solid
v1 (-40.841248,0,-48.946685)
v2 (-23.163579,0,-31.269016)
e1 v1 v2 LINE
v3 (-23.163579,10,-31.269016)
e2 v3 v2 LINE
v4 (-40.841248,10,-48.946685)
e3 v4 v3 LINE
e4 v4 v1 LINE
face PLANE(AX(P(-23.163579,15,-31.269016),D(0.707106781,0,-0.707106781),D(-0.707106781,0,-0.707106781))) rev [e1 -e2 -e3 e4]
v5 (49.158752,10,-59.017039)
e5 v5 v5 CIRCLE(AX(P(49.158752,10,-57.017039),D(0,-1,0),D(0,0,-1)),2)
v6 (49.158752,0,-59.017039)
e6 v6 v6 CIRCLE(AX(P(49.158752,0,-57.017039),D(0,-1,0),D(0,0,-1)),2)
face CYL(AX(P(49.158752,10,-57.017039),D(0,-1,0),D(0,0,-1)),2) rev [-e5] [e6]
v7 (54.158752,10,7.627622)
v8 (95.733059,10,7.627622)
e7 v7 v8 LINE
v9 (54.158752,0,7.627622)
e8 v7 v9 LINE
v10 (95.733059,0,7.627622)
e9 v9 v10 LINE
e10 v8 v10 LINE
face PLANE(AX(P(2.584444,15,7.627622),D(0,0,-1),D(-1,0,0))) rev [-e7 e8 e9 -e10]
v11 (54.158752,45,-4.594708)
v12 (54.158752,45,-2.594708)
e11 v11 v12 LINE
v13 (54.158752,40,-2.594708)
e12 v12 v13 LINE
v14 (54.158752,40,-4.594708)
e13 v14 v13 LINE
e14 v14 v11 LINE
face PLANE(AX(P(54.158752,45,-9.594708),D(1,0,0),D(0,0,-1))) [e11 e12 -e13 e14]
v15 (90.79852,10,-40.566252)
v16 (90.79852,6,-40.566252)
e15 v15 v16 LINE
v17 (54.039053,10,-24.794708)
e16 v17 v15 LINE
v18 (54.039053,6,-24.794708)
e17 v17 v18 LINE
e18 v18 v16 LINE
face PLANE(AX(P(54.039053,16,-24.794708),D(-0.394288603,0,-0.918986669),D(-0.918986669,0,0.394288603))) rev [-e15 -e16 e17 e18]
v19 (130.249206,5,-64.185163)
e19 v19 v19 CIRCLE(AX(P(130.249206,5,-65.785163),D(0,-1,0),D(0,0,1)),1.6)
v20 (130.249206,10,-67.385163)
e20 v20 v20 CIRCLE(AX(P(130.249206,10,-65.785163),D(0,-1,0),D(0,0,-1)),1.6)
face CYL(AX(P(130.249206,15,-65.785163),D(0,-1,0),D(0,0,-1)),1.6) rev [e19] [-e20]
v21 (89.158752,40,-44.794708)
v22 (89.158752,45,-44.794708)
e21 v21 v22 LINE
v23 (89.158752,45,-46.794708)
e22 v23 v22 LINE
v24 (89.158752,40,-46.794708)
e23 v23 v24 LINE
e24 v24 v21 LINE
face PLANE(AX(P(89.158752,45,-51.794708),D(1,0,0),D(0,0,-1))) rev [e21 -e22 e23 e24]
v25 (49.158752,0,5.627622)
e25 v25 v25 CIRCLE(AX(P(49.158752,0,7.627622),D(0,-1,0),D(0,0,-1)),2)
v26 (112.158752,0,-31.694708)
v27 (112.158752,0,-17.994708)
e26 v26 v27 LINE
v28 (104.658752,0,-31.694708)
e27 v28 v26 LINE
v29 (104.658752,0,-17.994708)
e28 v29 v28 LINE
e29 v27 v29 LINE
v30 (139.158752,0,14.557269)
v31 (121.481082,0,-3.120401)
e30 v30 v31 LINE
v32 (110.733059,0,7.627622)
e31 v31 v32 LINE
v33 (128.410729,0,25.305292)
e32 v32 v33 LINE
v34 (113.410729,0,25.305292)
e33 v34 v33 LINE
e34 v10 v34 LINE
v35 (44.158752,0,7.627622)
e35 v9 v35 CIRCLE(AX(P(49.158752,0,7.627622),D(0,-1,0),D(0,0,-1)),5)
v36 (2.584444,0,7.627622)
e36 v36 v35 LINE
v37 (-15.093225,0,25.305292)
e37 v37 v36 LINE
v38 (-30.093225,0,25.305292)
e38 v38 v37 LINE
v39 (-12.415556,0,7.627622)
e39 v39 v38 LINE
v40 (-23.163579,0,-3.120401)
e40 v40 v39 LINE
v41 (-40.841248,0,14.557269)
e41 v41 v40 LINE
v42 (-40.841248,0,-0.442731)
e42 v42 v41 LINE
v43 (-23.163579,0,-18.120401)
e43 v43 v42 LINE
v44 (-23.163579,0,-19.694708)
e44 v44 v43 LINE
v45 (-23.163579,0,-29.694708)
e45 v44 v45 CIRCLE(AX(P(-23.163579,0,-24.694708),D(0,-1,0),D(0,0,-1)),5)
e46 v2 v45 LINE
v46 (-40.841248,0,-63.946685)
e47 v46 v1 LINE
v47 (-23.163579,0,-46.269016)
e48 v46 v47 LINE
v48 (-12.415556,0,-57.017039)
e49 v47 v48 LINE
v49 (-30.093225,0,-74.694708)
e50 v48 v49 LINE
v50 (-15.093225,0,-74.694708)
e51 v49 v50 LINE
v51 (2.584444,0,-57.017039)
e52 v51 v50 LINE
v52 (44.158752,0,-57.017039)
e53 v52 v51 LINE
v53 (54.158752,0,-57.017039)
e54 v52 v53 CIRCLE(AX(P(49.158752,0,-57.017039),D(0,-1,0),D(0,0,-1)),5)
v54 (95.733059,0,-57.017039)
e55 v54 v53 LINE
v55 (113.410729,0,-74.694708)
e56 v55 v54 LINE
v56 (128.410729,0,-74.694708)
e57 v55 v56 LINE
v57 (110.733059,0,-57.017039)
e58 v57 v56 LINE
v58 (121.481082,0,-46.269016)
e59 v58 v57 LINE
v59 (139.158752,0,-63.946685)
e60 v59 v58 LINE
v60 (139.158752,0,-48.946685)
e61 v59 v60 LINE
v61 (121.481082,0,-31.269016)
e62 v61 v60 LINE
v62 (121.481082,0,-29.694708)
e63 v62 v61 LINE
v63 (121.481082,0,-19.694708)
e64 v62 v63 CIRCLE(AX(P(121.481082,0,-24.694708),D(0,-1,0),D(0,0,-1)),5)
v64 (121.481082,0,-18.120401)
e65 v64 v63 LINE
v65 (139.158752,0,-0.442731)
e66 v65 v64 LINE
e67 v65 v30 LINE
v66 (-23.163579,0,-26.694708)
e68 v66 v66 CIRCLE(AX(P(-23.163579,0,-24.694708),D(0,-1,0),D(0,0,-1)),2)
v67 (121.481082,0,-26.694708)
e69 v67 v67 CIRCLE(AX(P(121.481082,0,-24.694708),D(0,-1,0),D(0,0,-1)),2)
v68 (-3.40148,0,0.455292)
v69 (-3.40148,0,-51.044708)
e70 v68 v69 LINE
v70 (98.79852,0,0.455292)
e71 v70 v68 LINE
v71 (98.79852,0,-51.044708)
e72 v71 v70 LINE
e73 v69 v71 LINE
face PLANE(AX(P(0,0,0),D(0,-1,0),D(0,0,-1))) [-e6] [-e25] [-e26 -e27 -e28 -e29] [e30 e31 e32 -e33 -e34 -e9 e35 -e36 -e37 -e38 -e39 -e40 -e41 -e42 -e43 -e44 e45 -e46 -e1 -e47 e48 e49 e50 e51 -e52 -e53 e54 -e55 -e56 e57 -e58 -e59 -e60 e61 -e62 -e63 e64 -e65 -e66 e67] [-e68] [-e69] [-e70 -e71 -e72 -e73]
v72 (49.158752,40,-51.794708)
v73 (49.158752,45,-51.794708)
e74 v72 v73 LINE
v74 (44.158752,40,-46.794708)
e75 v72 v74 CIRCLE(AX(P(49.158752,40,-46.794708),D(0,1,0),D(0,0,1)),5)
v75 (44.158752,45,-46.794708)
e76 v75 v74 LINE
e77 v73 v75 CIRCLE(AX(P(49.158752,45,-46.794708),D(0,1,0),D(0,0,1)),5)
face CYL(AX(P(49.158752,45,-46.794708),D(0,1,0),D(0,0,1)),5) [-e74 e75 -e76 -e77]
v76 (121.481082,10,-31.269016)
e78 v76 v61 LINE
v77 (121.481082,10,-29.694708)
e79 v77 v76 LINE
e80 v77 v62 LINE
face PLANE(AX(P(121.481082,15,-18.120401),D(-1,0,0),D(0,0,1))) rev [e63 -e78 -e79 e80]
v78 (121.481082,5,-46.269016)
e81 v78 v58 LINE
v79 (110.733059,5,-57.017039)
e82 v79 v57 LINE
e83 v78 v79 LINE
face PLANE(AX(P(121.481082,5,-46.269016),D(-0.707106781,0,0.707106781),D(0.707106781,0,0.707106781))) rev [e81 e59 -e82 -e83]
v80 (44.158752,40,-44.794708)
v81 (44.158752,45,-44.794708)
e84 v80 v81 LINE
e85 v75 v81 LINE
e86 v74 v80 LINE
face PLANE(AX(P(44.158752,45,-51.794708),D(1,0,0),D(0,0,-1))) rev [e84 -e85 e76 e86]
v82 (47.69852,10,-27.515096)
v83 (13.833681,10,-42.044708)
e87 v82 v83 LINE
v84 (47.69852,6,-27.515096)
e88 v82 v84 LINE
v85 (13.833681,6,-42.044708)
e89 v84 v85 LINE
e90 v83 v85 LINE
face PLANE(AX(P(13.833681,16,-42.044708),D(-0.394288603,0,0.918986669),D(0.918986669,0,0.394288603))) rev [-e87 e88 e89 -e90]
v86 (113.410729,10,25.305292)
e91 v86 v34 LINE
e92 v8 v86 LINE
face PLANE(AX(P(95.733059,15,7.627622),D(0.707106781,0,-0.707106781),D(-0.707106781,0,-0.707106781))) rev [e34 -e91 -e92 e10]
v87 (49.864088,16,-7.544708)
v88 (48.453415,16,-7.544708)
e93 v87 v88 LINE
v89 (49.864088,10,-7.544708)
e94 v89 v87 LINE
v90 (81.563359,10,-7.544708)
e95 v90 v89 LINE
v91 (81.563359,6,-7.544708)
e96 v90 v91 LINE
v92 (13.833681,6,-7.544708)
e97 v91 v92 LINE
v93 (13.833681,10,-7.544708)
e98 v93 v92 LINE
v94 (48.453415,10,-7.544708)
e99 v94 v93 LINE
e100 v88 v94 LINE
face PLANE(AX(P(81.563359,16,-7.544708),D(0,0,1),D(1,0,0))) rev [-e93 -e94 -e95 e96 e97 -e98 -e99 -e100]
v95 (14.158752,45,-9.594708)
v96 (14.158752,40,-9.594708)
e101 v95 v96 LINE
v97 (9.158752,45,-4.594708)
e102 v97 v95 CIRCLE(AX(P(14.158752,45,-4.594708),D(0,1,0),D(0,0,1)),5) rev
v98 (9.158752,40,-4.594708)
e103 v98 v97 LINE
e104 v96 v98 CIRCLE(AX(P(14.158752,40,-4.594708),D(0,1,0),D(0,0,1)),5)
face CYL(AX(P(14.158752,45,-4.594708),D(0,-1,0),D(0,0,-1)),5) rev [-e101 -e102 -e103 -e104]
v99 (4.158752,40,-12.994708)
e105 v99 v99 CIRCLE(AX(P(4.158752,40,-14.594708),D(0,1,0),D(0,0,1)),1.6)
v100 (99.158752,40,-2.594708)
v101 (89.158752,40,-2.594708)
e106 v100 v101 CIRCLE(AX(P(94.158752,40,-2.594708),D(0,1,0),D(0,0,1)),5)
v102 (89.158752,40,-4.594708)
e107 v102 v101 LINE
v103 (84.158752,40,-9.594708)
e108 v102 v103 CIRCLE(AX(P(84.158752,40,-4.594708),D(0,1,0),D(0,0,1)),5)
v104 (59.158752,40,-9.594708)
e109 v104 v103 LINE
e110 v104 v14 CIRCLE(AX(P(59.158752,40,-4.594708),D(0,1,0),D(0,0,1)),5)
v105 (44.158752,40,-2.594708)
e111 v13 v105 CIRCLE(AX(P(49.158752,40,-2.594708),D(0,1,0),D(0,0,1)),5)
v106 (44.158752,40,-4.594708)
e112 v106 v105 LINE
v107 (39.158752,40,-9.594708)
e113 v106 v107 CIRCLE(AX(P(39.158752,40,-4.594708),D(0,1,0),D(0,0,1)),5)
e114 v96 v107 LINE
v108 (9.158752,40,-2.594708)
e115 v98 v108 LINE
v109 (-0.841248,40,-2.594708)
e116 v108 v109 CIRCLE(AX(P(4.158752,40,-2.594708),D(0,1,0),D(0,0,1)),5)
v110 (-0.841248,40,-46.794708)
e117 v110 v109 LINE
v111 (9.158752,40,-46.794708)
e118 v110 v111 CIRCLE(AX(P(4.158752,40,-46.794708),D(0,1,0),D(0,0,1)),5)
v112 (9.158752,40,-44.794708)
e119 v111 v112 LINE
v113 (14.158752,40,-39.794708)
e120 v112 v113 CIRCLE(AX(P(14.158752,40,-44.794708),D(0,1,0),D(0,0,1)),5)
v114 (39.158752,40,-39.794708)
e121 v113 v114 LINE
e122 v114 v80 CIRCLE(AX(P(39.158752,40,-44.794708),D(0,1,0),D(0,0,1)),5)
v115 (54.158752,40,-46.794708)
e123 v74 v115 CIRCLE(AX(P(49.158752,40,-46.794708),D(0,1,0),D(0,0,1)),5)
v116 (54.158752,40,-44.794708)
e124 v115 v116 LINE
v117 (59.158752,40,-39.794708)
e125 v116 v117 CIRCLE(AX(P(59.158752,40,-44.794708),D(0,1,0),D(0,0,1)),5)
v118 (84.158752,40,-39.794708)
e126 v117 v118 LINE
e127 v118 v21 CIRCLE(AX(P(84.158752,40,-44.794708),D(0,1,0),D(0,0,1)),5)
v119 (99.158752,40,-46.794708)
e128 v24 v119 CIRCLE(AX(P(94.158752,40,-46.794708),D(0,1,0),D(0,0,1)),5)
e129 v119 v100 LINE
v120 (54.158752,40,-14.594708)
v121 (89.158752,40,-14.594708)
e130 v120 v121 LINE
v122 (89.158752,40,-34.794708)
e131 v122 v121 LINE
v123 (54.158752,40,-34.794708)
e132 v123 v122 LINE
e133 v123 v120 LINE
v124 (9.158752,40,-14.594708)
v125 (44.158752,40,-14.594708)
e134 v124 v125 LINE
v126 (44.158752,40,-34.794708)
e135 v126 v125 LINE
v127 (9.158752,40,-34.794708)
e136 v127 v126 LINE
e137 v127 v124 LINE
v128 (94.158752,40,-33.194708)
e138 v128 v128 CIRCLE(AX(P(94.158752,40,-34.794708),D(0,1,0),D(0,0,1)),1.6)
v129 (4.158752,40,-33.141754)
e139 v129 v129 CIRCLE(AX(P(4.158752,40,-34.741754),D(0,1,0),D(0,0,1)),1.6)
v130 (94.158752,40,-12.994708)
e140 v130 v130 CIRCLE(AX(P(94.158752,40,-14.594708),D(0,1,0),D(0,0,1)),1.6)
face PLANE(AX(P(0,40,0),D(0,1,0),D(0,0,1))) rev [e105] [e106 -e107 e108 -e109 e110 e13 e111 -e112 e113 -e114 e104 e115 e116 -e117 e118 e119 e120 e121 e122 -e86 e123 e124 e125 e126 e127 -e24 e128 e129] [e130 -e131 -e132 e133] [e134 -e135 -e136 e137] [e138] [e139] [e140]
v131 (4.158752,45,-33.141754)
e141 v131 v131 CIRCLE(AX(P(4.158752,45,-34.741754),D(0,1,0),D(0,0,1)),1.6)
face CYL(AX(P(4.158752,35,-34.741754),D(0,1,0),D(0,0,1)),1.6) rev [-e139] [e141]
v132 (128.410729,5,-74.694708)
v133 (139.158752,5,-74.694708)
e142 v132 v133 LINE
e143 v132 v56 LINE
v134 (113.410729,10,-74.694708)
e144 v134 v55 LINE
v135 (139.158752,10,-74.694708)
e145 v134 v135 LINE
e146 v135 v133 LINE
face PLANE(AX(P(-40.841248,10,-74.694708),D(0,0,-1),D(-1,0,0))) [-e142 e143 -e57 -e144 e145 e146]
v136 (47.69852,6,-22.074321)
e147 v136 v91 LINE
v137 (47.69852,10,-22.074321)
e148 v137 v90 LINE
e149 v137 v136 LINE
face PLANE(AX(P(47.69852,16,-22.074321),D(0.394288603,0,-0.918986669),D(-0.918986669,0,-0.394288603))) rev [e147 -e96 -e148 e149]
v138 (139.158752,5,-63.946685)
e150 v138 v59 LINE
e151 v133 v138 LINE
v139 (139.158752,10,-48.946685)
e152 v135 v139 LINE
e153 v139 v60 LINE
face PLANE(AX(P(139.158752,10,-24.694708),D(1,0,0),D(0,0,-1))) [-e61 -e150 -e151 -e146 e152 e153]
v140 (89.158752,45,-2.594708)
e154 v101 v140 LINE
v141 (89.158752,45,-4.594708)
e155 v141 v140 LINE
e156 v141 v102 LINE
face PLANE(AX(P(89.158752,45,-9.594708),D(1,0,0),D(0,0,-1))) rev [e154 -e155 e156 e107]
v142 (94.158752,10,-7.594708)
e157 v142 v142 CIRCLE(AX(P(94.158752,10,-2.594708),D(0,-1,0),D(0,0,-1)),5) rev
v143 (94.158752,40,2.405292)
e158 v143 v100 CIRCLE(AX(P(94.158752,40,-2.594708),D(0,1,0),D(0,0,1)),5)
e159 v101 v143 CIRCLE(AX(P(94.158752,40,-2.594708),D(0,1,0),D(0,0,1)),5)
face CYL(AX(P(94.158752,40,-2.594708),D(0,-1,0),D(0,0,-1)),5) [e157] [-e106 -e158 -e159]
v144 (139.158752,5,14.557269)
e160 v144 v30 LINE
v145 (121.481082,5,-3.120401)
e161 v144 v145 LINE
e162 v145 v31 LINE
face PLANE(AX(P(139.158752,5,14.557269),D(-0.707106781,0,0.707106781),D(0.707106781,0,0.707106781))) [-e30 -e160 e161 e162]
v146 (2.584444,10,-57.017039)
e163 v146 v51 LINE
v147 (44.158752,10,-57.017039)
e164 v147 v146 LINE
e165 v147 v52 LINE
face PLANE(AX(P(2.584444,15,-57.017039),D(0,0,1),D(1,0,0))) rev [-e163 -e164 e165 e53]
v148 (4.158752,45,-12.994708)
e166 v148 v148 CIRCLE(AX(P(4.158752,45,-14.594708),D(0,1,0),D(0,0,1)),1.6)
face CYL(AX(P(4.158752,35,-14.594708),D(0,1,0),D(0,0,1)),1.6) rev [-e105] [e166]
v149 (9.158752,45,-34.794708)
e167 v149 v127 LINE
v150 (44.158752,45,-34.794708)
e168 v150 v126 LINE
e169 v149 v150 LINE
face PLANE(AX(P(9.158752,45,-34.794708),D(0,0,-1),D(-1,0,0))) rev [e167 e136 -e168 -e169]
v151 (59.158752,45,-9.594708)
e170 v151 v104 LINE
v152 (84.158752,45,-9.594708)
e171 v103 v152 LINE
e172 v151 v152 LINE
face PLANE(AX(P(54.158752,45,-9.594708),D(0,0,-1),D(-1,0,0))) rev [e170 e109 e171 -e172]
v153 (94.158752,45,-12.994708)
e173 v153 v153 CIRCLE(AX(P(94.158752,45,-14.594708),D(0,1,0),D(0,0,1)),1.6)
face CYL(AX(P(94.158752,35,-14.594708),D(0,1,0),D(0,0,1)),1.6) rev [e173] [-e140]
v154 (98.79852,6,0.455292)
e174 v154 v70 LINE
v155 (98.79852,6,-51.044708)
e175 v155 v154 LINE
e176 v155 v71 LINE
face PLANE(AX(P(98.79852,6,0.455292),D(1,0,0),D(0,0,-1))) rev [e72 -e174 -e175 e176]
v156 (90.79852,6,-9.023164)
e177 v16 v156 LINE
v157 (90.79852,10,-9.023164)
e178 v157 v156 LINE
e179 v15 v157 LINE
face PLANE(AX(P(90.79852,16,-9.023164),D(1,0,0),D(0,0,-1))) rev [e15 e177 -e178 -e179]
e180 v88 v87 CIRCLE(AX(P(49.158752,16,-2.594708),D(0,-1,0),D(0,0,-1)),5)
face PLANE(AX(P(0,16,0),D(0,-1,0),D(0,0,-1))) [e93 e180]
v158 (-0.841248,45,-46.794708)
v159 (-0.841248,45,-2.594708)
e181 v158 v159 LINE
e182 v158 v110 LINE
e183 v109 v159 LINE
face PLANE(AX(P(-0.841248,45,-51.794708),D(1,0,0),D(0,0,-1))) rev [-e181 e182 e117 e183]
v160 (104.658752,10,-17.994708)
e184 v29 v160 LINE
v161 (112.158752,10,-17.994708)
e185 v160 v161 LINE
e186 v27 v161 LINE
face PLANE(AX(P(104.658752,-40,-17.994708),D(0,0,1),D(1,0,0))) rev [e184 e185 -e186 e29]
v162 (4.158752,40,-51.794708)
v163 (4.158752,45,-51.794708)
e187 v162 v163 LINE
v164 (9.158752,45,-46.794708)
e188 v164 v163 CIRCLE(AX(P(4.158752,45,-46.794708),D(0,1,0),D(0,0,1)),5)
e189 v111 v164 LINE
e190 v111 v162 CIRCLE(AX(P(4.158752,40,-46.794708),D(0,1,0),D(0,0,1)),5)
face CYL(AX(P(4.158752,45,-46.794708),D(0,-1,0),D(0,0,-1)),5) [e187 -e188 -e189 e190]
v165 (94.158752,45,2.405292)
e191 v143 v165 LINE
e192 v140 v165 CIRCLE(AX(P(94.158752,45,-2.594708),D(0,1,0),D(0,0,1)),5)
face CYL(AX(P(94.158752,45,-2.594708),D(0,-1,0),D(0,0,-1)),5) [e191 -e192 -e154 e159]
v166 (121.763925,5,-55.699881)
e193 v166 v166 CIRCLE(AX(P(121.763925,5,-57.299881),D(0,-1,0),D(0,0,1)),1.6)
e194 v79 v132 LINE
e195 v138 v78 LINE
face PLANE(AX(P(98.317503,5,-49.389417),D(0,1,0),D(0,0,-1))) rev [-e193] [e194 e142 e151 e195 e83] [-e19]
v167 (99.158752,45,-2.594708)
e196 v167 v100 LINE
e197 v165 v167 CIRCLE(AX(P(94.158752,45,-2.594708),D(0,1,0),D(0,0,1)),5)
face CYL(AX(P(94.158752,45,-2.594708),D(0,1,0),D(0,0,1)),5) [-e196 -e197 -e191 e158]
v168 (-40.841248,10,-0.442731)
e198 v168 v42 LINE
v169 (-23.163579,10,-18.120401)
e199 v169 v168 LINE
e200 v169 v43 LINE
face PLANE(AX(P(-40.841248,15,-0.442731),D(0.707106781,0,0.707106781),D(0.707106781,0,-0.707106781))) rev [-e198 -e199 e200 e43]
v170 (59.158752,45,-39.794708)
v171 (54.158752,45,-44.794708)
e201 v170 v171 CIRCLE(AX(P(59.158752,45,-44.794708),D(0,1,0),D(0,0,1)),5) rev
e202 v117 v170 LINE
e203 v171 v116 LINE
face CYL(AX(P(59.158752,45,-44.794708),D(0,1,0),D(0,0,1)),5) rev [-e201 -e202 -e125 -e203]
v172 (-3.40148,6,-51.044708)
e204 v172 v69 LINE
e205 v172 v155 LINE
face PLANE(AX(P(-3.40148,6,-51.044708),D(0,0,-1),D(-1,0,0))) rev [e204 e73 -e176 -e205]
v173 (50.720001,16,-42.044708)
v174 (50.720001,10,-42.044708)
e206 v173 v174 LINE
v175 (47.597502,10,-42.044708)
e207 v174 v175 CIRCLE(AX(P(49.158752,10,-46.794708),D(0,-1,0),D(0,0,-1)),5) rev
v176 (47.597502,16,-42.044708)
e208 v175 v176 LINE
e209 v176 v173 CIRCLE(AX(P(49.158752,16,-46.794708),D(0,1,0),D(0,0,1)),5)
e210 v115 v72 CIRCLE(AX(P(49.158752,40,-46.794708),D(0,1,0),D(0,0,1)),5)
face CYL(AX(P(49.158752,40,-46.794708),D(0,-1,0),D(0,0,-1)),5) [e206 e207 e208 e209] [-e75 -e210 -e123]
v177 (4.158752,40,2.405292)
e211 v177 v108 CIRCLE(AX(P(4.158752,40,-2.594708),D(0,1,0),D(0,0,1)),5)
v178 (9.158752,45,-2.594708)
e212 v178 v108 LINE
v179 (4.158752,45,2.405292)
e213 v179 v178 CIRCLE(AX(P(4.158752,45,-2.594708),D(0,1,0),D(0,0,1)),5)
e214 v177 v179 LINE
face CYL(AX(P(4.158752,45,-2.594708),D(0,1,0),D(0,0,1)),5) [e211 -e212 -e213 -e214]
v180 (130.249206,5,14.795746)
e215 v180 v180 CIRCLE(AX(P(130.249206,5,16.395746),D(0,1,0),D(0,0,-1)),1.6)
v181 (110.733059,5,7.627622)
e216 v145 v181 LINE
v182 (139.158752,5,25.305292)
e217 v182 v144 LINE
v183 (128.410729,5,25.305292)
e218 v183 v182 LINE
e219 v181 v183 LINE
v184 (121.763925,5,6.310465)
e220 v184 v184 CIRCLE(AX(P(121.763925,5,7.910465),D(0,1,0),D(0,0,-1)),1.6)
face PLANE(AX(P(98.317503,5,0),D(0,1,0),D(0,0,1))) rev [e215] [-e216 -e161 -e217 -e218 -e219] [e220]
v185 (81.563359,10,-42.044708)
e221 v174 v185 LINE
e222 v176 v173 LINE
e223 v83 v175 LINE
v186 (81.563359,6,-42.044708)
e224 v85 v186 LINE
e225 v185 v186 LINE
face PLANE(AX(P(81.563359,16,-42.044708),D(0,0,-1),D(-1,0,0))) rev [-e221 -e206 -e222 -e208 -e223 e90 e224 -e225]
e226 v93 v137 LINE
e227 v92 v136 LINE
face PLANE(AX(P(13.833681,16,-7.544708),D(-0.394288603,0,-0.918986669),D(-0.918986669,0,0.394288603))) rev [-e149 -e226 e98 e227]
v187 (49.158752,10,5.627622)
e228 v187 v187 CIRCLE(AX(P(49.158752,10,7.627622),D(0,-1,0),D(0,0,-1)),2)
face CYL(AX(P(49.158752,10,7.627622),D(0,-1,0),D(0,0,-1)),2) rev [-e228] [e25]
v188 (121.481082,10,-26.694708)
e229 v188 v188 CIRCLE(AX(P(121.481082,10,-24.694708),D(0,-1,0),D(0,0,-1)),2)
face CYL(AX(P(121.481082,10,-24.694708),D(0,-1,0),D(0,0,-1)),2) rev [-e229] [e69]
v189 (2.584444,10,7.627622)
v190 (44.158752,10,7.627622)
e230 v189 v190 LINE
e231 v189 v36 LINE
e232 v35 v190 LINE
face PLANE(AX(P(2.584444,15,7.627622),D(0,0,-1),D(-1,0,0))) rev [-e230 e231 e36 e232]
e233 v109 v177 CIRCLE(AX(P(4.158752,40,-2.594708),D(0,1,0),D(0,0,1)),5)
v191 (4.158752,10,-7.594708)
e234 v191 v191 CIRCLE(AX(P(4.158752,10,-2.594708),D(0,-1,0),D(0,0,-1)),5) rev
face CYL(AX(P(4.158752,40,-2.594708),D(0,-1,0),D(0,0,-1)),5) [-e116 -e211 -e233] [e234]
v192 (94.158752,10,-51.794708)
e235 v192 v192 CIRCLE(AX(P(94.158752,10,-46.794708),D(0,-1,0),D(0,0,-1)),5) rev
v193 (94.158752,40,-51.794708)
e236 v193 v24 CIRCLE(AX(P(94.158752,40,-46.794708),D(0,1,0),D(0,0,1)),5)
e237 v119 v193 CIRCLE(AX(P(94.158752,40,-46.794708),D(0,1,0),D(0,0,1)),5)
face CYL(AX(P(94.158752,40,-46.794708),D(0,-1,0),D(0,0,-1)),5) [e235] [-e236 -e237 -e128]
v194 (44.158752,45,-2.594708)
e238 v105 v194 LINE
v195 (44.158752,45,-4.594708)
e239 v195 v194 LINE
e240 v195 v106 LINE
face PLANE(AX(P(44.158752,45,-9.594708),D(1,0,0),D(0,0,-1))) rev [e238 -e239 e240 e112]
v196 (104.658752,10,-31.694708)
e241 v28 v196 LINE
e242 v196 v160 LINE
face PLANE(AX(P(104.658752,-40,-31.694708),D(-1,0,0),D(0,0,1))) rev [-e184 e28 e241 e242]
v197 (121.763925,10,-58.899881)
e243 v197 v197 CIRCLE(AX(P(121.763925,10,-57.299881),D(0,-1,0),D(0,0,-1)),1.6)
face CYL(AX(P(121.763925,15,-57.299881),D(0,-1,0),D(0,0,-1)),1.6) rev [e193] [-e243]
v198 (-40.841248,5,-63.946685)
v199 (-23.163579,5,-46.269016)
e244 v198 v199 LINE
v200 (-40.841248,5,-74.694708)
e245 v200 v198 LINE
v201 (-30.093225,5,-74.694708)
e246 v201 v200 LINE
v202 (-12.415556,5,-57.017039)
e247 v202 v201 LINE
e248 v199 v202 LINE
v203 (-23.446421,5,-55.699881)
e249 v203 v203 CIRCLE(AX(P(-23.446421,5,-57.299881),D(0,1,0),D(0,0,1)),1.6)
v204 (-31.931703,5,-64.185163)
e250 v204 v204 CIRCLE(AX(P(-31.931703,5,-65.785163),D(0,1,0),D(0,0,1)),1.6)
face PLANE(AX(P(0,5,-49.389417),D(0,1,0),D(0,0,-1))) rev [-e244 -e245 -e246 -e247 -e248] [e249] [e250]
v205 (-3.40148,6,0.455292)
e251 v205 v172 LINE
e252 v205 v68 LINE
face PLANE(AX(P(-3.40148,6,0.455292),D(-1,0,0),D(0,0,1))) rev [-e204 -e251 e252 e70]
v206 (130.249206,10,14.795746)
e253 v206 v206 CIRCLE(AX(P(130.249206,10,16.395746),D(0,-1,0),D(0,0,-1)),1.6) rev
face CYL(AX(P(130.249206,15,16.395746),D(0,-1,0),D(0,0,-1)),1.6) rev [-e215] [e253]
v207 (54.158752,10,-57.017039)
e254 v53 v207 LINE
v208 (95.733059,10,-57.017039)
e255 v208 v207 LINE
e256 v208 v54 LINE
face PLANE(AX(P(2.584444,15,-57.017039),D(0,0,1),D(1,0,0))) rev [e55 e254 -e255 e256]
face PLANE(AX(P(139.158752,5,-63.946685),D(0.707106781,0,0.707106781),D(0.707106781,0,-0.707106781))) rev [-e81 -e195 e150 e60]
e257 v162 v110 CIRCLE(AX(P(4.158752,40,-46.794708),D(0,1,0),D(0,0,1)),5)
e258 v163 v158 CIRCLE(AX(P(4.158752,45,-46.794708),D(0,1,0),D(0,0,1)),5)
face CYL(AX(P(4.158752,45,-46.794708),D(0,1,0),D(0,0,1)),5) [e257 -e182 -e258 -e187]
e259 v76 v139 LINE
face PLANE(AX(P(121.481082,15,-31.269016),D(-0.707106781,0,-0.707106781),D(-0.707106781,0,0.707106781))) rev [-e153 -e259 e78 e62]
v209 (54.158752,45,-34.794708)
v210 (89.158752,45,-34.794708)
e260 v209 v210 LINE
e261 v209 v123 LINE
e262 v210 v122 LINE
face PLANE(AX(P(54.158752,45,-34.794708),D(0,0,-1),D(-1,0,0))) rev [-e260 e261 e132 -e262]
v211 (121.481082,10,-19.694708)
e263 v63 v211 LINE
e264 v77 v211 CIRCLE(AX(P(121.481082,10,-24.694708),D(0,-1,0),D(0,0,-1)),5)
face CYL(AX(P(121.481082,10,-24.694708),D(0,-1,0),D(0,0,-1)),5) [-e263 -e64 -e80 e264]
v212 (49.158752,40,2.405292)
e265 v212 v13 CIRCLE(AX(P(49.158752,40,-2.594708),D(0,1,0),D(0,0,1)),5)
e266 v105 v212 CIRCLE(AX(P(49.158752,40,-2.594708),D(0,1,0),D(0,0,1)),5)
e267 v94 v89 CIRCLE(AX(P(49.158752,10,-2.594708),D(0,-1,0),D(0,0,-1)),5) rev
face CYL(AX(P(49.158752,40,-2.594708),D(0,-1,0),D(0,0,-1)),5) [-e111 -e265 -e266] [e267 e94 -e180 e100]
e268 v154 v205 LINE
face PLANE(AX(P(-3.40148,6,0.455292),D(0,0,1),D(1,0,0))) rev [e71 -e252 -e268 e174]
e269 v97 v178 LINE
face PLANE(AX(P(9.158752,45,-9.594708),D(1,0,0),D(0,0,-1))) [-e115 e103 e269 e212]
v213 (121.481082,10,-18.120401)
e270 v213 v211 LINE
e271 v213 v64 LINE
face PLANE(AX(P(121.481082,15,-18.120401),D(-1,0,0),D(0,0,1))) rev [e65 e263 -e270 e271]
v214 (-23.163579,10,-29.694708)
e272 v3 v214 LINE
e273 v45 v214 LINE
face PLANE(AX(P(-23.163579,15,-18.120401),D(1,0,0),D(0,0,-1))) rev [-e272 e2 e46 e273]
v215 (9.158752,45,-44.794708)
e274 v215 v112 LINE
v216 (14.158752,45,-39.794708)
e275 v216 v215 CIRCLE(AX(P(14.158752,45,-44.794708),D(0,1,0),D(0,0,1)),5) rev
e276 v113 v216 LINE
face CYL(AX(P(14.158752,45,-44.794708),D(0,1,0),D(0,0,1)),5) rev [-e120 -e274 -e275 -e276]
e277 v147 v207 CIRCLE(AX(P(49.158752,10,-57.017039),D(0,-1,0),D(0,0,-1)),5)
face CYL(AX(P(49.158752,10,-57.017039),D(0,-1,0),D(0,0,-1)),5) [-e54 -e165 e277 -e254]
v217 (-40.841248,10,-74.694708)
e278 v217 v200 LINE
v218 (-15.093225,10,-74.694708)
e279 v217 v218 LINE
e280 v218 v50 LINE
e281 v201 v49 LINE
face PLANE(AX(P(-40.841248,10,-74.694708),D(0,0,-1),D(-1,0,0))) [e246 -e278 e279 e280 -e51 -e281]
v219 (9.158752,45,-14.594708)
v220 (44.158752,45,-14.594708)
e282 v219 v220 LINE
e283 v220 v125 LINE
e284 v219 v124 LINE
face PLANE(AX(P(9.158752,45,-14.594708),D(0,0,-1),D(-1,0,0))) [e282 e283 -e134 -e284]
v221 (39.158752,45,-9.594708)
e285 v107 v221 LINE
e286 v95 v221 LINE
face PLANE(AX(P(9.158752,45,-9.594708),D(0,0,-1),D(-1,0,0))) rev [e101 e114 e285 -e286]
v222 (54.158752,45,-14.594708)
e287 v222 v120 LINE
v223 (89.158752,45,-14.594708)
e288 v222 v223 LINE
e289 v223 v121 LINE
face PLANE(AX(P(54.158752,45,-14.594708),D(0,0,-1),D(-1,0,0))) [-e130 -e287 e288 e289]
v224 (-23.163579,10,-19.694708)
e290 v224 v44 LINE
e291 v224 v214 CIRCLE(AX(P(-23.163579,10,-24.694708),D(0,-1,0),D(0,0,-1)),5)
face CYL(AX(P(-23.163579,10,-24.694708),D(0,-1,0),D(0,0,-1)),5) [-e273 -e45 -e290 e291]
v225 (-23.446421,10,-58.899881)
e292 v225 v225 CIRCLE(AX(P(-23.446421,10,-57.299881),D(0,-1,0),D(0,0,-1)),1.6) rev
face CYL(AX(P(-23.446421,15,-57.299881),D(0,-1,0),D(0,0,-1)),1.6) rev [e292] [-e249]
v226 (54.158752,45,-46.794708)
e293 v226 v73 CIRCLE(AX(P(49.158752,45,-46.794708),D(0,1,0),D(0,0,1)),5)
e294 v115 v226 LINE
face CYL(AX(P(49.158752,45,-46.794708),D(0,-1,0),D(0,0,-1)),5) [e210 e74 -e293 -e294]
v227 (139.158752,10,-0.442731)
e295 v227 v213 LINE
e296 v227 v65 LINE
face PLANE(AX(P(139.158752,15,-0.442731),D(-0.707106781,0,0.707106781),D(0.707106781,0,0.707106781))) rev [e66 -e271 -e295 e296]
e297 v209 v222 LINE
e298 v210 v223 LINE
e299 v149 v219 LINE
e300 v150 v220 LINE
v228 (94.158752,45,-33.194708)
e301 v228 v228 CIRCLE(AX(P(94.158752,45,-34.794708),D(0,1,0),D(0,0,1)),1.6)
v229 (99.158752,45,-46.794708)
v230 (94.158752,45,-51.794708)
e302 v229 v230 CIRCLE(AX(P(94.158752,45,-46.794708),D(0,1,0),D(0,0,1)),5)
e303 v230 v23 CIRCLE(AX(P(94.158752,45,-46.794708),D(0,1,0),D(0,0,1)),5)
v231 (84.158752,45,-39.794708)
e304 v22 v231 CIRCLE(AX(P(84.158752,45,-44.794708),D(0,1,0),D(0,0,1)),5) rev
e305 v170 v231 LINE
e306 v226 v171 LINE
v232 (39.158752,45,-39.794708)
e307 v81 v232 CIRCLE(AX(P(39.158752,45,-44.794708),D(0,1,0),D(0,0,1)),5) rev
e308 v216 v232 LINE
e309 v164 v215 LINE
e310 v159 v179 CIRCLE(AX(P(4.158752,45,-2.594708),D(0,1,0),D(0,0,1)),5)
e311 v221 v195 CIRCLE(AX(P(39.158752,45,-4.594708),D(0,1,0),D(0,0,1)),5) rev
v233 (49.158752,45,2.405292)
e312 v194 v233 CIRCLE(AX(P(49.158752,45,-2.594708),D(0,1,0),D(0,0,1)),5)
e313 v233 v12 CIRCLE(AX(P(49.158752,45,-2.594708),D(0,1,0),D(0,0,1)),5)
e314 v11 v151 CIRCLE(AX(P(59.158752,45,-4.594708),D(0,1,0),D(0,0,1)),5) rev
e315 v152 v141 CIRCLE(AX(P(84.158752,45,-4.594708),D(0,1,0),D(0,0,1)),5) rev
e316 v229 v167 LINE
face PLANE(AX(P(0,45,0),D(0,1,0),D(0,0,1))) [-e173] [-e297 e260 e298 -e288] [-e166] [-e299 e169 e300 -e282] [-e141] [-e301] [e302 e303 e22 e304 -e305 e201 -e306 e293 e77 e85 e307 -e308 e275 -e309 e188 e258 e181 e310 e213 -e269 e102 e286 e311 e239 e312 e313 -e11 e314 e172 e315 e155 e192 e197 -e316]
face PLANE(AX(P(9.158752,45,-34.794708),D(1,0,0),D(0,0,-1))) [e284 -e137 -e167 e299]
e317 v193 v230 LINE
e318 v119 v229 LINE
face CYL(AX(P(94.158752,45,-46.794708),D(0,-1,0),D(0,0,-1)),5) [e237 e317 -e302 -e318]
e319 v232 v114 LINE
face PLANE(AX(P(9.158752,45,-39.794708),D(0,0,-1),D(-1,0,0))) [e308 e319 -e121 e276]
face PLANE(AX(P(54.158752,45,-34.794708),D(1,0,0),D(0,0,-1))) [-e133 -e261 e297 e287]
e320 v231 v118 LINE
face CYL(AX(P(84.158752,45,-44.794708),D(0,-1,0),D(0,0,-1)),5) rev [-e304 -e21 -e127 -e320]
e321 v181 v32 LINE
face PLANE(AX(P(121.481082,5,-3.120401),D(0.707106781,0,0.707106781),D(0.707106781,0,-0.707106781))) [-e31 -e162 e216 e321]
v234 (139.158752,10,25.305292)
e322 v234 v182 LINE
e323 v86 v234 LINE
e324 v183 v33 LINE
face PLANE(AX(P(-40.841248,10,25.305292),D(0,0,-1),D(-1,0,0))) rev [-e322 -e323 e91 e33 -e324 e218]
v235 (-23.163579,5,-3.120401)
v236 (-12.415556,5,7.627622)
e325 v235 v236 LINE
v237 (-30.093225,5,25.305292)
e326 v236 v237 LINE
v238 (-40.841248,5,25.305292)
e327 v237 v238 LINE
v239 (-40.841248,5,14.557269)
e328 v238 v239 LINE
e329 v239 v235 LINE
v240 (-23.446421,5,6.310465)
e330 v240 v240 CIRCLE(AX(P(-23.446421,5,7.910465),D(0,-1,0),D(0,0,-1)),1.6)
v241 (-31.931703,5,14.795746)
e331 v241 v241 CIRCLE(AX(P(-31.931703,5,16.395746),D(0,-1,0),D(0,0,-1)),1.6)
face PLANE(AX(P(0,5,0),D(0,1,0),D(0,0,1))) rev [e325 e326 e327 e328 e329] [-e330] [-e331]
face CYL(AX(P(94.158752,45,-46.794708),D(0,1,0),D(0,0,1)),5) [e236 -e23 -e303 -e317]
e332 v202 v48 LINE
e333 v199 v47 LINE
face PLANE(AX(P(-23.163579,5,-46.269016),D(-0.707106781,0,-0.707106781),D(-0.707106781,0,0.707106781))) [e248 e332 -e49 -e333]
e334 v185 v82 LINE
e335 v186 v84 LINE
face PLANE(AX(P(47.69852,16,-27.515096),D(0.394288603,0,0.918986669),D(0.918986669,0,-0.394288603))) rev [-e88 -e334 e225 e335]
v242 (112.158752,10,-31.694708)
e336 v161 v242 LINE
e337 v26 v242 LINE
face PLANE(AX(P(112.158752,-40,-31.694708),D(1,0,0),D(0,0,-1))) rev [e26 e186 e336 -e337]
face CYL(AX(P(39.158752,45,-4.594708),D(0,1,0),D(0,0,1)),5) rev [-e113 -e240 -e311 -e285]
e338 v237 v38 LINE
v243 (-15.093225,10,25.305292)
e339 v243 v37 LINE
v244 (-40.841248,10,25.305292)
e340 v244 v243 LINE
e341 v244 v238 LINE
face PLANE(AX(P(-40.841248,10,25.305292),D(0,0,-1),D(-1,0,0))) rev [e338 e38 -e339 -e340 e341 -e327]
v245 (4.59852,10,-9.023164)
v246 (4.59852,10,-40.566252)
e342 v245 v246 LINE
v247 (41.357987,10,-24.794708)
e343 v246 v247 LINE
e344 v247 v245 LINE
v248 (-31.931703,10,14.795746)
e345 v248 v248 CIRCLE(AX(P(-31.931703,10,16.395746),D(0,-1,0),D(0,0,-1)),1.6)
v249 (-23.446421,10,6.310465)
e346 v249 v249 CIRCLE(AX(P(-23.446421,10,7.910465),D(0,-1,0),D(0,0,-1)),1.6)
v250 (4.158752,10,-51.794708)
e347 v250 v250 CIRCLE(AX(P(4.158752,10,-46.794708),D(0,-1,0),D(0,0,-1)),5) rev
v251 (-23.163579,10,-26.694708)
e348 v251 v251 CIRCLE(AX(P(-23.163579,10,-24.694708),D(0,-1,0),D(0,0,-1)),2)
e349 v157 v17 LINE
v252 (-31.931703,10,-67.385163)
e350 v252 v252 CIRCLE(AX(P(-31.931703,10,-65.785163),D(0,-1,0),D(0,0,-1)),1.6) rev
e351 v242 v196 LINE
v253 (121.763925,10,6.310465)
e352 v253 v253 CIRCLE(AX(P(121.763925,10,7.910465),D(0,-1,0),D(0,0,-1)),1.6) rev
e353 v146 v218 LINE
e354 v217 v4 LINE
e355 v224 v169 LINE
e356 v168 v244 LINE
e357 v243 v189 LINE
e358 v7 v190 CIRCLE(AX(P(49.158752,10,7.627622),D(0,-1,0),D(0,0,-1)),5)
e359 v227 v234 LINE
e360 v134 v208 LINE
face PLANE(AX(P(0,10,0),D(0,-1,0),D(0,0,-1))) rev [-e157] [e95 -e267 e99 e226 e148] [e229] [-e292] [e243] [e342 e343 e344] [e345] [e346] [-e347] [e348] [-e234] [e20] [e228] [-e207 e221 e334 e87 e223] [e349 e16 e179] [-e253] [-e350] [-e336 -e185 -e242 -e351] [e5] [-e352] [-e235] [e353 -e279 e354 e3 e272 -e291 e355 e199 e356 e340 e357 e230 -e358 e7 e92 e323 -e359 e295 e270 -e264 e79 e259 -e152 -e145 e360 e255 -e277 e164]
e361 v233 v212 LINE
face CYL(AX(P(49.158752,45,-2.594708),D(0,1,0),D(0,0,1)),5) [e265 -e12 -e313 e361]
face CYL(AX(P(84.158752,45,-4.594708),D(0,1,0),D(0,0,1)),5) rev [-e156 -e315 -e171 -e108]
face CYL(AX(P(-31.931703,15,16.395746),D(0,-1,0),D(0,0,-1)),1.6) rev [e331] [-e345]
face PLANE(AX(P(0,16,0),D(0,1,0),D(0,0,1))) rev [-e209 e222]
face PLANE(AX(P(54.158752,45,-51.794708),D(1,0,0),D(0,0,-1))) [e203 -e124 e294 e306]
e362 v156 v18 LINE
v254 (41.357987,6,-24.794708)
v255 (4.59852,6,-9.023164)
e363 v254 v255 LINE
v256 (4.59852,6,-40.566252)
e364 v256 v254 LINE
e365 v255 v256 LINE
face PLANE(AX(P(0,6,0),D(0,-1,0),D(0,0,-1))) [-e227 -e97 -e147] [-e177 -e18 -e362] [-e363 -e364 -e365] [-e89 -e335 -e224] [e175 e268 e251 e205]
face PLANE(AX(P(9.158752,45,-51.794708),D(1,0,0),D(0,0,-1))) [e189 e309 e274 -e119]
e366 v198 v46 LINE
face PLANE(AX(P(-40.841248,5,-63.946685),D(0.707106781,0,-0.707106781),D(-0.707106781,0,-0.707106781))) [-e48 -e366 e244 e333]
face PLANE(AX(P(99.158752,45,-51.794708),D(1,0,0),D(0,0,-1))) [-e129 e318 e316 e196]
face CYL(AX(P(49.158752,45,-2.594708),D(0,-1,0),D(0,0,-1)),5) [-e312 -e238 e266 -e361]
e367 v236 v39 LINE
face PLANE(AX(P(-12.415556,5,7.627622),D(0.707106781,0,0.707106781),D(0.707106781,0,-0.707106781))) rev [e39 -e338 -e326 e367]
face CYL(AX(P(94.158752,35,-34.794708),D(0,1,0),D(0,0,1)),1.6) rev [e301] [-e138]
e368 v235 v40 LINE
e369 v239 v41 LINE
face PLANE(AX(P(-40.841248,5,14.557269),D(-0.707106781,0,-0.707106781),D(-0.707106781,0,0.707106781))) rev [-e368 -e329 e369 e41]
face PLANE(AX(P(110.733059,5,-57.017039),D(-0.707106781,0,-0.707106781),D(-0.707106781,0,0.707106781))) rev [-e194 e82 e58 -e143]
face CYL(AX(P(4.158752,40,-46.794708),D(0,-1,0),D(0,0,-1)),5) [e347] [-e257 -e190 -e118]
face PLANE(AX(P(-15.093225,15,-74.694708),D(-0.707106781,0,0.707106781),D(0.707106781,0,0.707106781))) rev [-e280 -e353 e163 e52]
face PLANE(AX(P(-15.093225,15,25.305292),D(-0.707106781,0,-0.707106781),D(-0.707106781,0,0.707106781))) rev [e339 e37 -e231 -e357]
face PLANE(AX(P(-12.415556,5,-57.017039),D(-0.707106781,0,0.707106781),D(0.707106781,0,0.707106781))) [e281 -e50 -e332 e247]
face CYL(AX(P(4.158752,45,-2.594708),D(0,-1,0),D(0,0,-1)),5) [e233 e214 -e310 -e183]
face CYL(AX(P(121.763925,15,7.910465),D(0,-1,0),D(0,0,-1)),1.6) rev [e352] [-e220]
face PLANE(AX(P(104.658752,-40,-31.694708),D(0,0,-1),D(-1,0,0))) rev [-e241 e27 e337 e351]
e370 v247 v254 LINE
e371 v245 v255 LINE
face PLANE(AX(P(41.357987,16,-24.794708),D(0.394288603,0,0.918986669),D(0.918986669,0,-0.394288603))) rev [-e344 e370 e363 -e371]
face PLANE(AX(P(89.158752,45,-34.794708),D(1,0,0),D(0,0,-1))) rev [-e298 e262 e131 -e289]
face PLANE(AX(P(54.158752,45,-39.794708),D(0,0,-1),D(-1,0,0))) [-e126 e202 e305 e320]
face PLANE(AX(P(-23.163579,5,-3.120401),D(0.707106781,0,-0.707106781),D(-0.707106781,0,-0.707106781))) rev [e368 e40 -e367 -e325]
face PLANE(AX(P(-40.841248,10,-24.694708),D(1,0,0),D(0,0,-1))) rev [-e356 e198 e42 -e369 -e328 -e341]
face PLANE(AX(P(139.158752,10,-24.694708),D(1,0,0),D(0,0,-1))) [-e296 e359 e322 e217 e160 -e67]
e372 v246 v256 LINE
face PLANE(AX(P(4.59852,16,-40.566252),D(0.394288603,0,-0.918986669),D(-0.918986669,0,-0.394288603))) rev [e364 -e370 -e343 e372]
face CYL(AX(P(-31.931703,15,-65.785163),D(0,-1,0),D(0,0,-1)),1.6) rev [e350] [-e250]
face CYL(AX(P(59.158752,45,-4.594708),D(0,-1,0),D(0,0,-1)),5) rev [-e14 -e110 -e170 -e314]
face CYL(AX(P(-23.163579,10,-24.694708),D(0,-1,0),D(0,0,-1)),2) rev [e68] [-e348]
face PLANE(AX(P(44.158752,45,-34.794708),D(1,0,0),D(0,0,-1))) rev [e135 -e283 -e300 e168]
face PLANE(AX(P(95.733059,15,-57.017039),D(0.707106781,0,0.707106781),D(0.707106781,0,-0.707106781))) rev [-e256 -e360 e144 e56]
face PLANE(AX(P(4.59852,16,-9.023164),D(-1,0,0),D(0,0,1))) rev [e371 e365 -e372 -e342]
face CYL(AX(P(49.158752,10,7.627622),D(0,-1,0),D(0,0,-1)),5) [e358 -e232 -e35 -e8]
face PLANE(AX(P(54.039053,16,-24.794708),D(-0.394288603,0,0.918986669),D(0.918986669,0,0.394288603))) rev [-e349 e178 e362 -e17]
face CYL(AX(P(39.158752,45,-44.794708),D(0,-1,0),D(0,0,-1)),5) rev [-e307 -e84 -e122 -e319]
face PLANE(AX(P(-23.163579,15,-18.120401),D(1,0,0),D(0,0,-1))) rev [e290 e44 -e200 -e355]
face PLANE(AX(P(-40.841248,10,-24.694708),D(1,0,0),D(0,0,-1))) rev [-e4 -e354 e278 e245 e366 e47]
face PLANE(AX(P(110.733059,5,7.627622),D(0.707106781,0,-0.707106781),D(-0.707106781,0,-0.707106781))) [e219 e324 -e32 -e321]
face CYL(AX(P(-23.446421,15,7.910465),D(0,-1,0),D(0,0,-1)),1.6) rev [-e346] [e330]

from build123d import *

# Parameters (mm, degrees)
SKETCH_1_W           = 90
SKETCH_1_H           = 50
EXTRUDE_1_DEPTH      = 10
CUT_EXTRUDE_2_DEPTH  = 5
SKETCH_7_R           = 1.6
CUT_EXTRUDE_3_DEPTH  = 10
MIRROR_3_DEPTH       = 10
MIRROR_START         = 5
MIRROR_3_2_OUTLINE_R = 1.6
MIRROR_3_2_DEPTH     = 5
SKETCH_8_R           = 5
EXTRUDE_2_DEPTH      = 30
SKETCH_10_W          = 35
SKETCH_10_H          = 20.2
EXTRUDE_6_DEPTH      = 5
SKETCH_11_W          = 102.2
SKETCH_11_H          = 51.5
CUT_EXTRUDE_4_DEPTH  = 6
SKETCH_12_W          = 7.5
SKETCH_12_H          = 13.7
CUT_EXTRUDE_5_DEPTH  = 50
FILLET_2_R           = 5
CUT_EXTRUDE_6_DEPTH  = 15
CUT_EXTRUDE_7_DEPTH  = 10
SKETCH_15_R          = 5
EXTRUDE_7_DEPTH      = 10
SKETCH_16_R          = 2
CUT_EXTRUDE_8_DEPTH  = 10
SKETCH_17_R          = 1.6
CUT_EXTRUDE_9_DEPTH  = 10


# Read off the part's stored shape, not the designer's step: Зеркальное отражение3
with BuildPart() as part:
    # Эскиз1 → Бобышка-Вытянуть1 (new body)
    with BuildSketch(Plane(origin=(0, 0, 0), x_dir=(1, 0, 0), z_dir=(0, 1, 0))):
        with Locations((4.158751696, -0.305291723)):
            Rectangle(SKETCH_1_W, SKETCH_1_H)
    extrude(amount=EXTRUDE_1_DEPTH)

    # Эскиз2 → Вырез-Вытянуть2 (cut)
    with BuildSketch(Plane.XZ):
        Polygon((-40.841248304, 14.557268649), (-23.163578774, -3.12040088), (-12.4155557, 7.627622194), (-30.09322523, 25.305291723), (-40.841248304, 25.305291723), align=None)
    extrude(amount=-CUT_EXTRUDE_2_DEPTH, mode=Mode.SUBTRACT)

    # Эскиз7 → Вырез-Вытянуть3 (cut)
    with BuildSketch(Plane.XZ.offset(-5)):
        with Locations(Location((-31.931702861, 16.39574628, 0), (0, 0, 270))):
            Circle(SKETCH_7_R)
        with Locations(Location((-23.446421487, 7.910464906, 0), (0, 0, 270))):
            Circle(SKETCH_7_R)
    extrude(amount=-CUT_EXTRUDE_3_DEPTH, mode=Mode.SUBTRACT)

    # Зеркальное отражение3 outline → Зеркальное отражение3 (add)
    with BuildSketch(Plane(origin=(0, 0, 0), x_dir=(1, 0, 0), z_dir=(0, 1, 0))):
        Polygon((-40.841248304, 63.946685203), (-40.841248304, 24.694708277), (49.158751696, 24.694708277), (49.158751696, -25.305291723), (128.410728622, -25.305291723), (110.733059092, -7.627622194), (121.481082166, 3.12040088), (139.158751696, -14.557268649), (139.158751696, 63.946685203), (121.481082166, 46.269015673), (110.733059092, 57.017038747), (128.410728622, 74.694708277), (-30.09322523, 74.694708277), (-12.4155557, 57.017038747), (-23.163578774, 46.269015673), align=None)
    extrude(amount=MIRROR_3_DEPTH)

    # Mirror 3 2 outline → Mirror 3 2 (add)
    # profile 1 of 3: a face of its own
    with BuildSketch(Plane(origin=(0, 0, 0), x_dir=(1, 0, 0), z_dir=(0, 1, 0)).offset(MIRROR_START)):
        Polygon((-40.841248304, 74.694708277), (-40.841248304, 63.946685203), (-23.163578774, 46.269015673), (-12.4155557, 57.017038747), (-30.09322523, 74.694708277), align=None)
        with Locations((-23.446421487, 57.29988146)):
            Circle(MIRROR_3_2_OUTLINE_R, mode=Mode.SUBTRACT)
        with Locations((-31.931702861, 65.785162834)):
            Circle(MIRROR_3_2_OUTLINE_R, mode=Mode.SUBTRACT)
    # profile 2 of 3: a face of its own
    with BuildSketch(Plane(origin=(0, 0, 0), x_dir=(1, 0, 0), z_dir=(0, 1, 0)).offset(MIRROR_START)):
        Polygon((110.733059092, -7.627622194), (128.410728622, -25.305291723), (139.158751696, -25.305291723), (139.158751696, -14.557268649), (121.481082166, 3.12040088), align=None)
        with Locations((130.249206253, -16.39574628)):
            Circle(MIRROR_3_2_OUTLINE_R, mode=Mode.SUBTRACT)
        with Locations((121.763924879, -7.910464906)):
            Circle(MIRROR_3_2_OUTLINE_R, mode=Mode.SUBTRACT)
    # profile 3 of 3: a face of its own
    with BuildSketch(Plane(origin=(0, 0, 0), x_dir=(1, 0, 0), z_dir=(0, 1, 0)).offset(MIRROR_START)):
        Polygon((139.158751696, 74.694708277), (128.410728622, 74.694708277), (110.733059092, 57.017038747), (121.481082166, 46.269015673), (139.158751696, 63.946685203), align=None)
        with Locations((121.763924879, 57.29988146)):
            Circle(MIRROR_3_2_OUTLINE_R, mode=Mode.SUBTRACT)
        with Locations((130.249206253, 65.785162834)):
            Circle(MIRROR_3_2_OUTLINE_R, mode=Mode.SUBTRACT)
    extrude(amount=MIRROR_3_2_DEPTH)

    # Эскиз8 → Бобышка-Вытянуть2 (add)
    with BuildSketch(Plane(origin=(0, 10, 0), x_dir=(1, 0, 0), z_dir=(0, 1, 0))):
        with Locations(Location((49.158751696, 46.794708277, 0), (0, 0, 90))):
            Circle(SKETCH_8_R)
        with Locations(Location((94.158751696, 46.794708277, 0), (0, 0, 90))):
            Circle(SKETCH_8_R)
        with Locations(Location((94.158751696, 2.594708277, 0), (0, 0, 90))):
            Circle(SKETCH_8_R)
        with Locations(Location((4.158751696, 2.594708277, 0), (0, 0, 90))):
            Circle(SKETCH_8_R)
        with Locations(Location((49.158751696, 2.594708277, 0), (0, 0, 90))):
            Circle(SKETCH_8_R)
        with Locations(Location((4.158751696, 46.794708277, 0), (0, 0, 90))):
            Circle(SKETCH_8_R)
    extrude(amount=EXTRUDE_2_DEPTH)

    # Эскиз10 → Бобышка-Вытянуть6 (add)
    with BuildSketch(Plane(origin=(0, 40, 0), x_dir=(1, 0, 0), z_dir=(0, 1, 0))):
        Polygon((9.158751696, 51.794708277), (9.158751696, 39.794708277), (44.158751696, 39.794708277), (44.158751696, 51.794708277), (54.158751696, 51.794708277), (54.158751696, 39.794708277), (89.158751696, 39.794708277), (89.158751696, 51.794708277), (99.158751696, 51.794708277), (99.158751696, -2.405291723), (89.158751696, -2.405291723), (89.158751696, 9.594708277), (54.158751696, 9.594708277), (54.158751696, -2.405291723), (44.158751696, -2.405291723), (44.158751696, 9.594708277), (9.158751696, 9.594708277), (9.158751696, -2.405291723), (-0.841248304, -2.405291723), (-0.841248304, 51.794708277), align=None)
        with Locations((26.658751696, 24.694708277)):
            Rectangle(SKETCH_10_W, SKETCH_10_H, mode=Mode.SUBTRACT)
        with Locations((71.658751696, 24.694708277)):
            Rectangle(SKETCH_10_W, SKETCH_10_H, mode=Mode.SUBTRACT)
    extrude(amount=EXTRUDE_6_DEPTH)

    # Эскиз11 → Вырез-Вытянуть4 (cut)
    with BuildSketch(Plane(origin=(0, 0, 0), x_dir=(-1, 0, 0), z_dir=(0, -1, 0))):
        with Locations((-47.698520167, 25.294708277)):
            Rectangle(SKETCH_11_W, SKETCH_11_H)
    extrude(amount=-CUT_EXTRUDE_4_DEPTH, mode=Mode.SUBTRACT)

    # Эскиз12 → Вырез-Вытянуть5 (cut)
    with BuildSketch(Plane(origin=(0, 10, 0), x_dir=(1, 0, 0), z_dir=(0, 1, 0))):
        with Locations((108.408751696, 24.844708277)):
            Rectangle(SKETCH_12_W, SKETCH_12_H)
    extrude(amount=-CUT_EXTRUDE_5_DEPTH, mode=Mode.SUBTRACT)

    # Скругление2
    fillet_2_edges = [part.edges().sort_by_distance(p)[0] for p in [
        (54.158751696, 42.5, -9.594708277),
        (9.158751696, 42.5, -9.594708277),
        (-0.841248304, 42.5, 2.405291723),
        (9.158751696, 42.5, 2.405291723),
        (44.158751696, 42.5, -9.594708277),
        (54.158751696, 42.5, 2.405291723),
        (44.158751696, 42.5, 2.405291723),
        (89.158751696, 42.5, -9.594708277),
        (89.158751696, 42.5, 2.405291723),
        (99.158751696, 42.5, 2.405291723),
        (54.158751696, 42.5, -39.794708277),
        (9.158751696, 42.5, -39.794708277),
        (44.158751696, 42.5, -39.794708277),
        (99.158751696, 42.5, -51.794708277),
        (89.158751696, 42.5, -39.794708277),
        (89.158751696, 42.5, -51.794708277),
        (54.158751696, 42.5, -51.794708277),
        (44.158751696, 42.5, -51.794708277),
        (9.158751696, 42.5, -51.794708277),
        (-0.841248304, 42.5, -51.794708277),
    ]]
    fillet(fillet_2_edges, radius=FILLET_2_R - 0.0001)  # a hair under: the kernel refuses the full size

    # Эскиз13 → Вырез-Вытянуть6 (cut)
    with BuildSketch(Plane.XZ):
        Polygon((-15.09322523, 25.305291723), (2.5844443, 7.627622194), (95.733059092, 7.627622194), (113.410728622, 25.305291723), align=None)
        Polygon((-40.841248304, -0.442731351), (-23.163578774, -18.12040088), (-23.163578774, -31.269015673), (-40.841248304, -48.946685203), align=None)
        Polygon((-15.09322523, -74.694708277), (2.5844443, -57.017038747), (95.733059092, -57.017038747), (113.410728622, -74.694708277), align=None)
        Polygon((139.158751696, -0.442731351), (121.481082166, -18.12040088), (121.481082166, -31.269015673), (139.158751696, -48.946685203), align=None)
    extrude(amount=-CUT_EXTRUDE_6_DEPTH, mode=Mode.SUBTRACT)

    # Эскиз14 → Вырез-Вытянуть7 (cut)
    with BuildSketch(Plane.XZ.offset(-6)):
        Polygon((4.598520167, -9.023164144), (4.598520167, -40.56625241), (41.357986916, -24.794708277), align=None)
        Polygon((13.833681258, -7.544708277), (47.698520167, -22.074320609), (81.563359076, -7.544708277), align=None)
        Polygon((13.833681258, -42.044708277), (47.698520167, -27.515095944), (81.563359076, -42.044708277), align=None)
        Polygon((54.039053419, -24.794708277), (90.798520167, -40.56625241), (90.798520167, -9.023164144), align=None)
    extrude(amount=-CUT_EXTRUDE_7_DEPTH, mode=Mode.SUBTRACT)

    # Эскиз15 → Бобышка-Вытянуть7 (add)
    with BuildSketch(Plane.XZ):
        with Locations((49.158751696, 7.627622194)):
            Circle(SKETCH_15_R)
        with Locations((-23.163578774, -24.694708277)):
            Circle(SKETCH_15_R)
        with Locations((121.481082166, -24.694708277)):
            Circle(SKETCH_15_R)
        with Locations((49.158751696, -57.017038747)):
            Circle(SKETCH_15_R)
    extrude(amount=-EXTRUDE_7_DEPTH)

    # Эскиз16 → Вырез-Вытянуть8 (cut)
    with BuildSketch(Plane.XZ):
        with Locations(Location((49.158751696, 7.627622194, 0), (0, 0, 270))):
            Circle(SKETCH_16_R)
        with Locations(Location((-23.163578774, -24.694708277, 0), (0, 0, 270))):
            Circle(SKETCH_16_R)
        with Locations(Location((121.481082166, -24.694708277, 0), (0, 0, 270))):
            Circle(SKETCH_16_R)
        with Locations(Location((49.158751696, -57.017038747, 0), (0, 0, 270))):
            Circle(SKETCH_16_R)
    extrude(amount=-CUT_EXTRUDE_8_DEPTH, mode=Mode.SUBTRACT)

    # Эскиз17 → Вырез-Вытянуть9 (cut)
    with BuildSketch(Plane(origin=(0, 45, 0), x_dir=(1, 0, 0), z_dir=(0, 1, 0))):
        with Locations(Location((4.158751696, 34.74175422, 0), (0, 0, 270))):
            Circle(SKETCH_17_R)
        with Locations(Location((94.158751696, 34.794708277, 0), (0, 0, 270))):
            Circle(SKETCH_17_R)
        with Locations(Location((94.158751696, 14.594708277, 0), (0, 0, 270))):
            Circle(SKETCH_17_R)
        with Locations(Location((4.158751696, 14.594708277, 0), (0, 0, 270))):
            Circle(SKETCH_17_R)
    extrude(amount=-CUT_EXTRUDE_9_DEPTH, mode=Mode.SUBTRACT)


solid = part.part
